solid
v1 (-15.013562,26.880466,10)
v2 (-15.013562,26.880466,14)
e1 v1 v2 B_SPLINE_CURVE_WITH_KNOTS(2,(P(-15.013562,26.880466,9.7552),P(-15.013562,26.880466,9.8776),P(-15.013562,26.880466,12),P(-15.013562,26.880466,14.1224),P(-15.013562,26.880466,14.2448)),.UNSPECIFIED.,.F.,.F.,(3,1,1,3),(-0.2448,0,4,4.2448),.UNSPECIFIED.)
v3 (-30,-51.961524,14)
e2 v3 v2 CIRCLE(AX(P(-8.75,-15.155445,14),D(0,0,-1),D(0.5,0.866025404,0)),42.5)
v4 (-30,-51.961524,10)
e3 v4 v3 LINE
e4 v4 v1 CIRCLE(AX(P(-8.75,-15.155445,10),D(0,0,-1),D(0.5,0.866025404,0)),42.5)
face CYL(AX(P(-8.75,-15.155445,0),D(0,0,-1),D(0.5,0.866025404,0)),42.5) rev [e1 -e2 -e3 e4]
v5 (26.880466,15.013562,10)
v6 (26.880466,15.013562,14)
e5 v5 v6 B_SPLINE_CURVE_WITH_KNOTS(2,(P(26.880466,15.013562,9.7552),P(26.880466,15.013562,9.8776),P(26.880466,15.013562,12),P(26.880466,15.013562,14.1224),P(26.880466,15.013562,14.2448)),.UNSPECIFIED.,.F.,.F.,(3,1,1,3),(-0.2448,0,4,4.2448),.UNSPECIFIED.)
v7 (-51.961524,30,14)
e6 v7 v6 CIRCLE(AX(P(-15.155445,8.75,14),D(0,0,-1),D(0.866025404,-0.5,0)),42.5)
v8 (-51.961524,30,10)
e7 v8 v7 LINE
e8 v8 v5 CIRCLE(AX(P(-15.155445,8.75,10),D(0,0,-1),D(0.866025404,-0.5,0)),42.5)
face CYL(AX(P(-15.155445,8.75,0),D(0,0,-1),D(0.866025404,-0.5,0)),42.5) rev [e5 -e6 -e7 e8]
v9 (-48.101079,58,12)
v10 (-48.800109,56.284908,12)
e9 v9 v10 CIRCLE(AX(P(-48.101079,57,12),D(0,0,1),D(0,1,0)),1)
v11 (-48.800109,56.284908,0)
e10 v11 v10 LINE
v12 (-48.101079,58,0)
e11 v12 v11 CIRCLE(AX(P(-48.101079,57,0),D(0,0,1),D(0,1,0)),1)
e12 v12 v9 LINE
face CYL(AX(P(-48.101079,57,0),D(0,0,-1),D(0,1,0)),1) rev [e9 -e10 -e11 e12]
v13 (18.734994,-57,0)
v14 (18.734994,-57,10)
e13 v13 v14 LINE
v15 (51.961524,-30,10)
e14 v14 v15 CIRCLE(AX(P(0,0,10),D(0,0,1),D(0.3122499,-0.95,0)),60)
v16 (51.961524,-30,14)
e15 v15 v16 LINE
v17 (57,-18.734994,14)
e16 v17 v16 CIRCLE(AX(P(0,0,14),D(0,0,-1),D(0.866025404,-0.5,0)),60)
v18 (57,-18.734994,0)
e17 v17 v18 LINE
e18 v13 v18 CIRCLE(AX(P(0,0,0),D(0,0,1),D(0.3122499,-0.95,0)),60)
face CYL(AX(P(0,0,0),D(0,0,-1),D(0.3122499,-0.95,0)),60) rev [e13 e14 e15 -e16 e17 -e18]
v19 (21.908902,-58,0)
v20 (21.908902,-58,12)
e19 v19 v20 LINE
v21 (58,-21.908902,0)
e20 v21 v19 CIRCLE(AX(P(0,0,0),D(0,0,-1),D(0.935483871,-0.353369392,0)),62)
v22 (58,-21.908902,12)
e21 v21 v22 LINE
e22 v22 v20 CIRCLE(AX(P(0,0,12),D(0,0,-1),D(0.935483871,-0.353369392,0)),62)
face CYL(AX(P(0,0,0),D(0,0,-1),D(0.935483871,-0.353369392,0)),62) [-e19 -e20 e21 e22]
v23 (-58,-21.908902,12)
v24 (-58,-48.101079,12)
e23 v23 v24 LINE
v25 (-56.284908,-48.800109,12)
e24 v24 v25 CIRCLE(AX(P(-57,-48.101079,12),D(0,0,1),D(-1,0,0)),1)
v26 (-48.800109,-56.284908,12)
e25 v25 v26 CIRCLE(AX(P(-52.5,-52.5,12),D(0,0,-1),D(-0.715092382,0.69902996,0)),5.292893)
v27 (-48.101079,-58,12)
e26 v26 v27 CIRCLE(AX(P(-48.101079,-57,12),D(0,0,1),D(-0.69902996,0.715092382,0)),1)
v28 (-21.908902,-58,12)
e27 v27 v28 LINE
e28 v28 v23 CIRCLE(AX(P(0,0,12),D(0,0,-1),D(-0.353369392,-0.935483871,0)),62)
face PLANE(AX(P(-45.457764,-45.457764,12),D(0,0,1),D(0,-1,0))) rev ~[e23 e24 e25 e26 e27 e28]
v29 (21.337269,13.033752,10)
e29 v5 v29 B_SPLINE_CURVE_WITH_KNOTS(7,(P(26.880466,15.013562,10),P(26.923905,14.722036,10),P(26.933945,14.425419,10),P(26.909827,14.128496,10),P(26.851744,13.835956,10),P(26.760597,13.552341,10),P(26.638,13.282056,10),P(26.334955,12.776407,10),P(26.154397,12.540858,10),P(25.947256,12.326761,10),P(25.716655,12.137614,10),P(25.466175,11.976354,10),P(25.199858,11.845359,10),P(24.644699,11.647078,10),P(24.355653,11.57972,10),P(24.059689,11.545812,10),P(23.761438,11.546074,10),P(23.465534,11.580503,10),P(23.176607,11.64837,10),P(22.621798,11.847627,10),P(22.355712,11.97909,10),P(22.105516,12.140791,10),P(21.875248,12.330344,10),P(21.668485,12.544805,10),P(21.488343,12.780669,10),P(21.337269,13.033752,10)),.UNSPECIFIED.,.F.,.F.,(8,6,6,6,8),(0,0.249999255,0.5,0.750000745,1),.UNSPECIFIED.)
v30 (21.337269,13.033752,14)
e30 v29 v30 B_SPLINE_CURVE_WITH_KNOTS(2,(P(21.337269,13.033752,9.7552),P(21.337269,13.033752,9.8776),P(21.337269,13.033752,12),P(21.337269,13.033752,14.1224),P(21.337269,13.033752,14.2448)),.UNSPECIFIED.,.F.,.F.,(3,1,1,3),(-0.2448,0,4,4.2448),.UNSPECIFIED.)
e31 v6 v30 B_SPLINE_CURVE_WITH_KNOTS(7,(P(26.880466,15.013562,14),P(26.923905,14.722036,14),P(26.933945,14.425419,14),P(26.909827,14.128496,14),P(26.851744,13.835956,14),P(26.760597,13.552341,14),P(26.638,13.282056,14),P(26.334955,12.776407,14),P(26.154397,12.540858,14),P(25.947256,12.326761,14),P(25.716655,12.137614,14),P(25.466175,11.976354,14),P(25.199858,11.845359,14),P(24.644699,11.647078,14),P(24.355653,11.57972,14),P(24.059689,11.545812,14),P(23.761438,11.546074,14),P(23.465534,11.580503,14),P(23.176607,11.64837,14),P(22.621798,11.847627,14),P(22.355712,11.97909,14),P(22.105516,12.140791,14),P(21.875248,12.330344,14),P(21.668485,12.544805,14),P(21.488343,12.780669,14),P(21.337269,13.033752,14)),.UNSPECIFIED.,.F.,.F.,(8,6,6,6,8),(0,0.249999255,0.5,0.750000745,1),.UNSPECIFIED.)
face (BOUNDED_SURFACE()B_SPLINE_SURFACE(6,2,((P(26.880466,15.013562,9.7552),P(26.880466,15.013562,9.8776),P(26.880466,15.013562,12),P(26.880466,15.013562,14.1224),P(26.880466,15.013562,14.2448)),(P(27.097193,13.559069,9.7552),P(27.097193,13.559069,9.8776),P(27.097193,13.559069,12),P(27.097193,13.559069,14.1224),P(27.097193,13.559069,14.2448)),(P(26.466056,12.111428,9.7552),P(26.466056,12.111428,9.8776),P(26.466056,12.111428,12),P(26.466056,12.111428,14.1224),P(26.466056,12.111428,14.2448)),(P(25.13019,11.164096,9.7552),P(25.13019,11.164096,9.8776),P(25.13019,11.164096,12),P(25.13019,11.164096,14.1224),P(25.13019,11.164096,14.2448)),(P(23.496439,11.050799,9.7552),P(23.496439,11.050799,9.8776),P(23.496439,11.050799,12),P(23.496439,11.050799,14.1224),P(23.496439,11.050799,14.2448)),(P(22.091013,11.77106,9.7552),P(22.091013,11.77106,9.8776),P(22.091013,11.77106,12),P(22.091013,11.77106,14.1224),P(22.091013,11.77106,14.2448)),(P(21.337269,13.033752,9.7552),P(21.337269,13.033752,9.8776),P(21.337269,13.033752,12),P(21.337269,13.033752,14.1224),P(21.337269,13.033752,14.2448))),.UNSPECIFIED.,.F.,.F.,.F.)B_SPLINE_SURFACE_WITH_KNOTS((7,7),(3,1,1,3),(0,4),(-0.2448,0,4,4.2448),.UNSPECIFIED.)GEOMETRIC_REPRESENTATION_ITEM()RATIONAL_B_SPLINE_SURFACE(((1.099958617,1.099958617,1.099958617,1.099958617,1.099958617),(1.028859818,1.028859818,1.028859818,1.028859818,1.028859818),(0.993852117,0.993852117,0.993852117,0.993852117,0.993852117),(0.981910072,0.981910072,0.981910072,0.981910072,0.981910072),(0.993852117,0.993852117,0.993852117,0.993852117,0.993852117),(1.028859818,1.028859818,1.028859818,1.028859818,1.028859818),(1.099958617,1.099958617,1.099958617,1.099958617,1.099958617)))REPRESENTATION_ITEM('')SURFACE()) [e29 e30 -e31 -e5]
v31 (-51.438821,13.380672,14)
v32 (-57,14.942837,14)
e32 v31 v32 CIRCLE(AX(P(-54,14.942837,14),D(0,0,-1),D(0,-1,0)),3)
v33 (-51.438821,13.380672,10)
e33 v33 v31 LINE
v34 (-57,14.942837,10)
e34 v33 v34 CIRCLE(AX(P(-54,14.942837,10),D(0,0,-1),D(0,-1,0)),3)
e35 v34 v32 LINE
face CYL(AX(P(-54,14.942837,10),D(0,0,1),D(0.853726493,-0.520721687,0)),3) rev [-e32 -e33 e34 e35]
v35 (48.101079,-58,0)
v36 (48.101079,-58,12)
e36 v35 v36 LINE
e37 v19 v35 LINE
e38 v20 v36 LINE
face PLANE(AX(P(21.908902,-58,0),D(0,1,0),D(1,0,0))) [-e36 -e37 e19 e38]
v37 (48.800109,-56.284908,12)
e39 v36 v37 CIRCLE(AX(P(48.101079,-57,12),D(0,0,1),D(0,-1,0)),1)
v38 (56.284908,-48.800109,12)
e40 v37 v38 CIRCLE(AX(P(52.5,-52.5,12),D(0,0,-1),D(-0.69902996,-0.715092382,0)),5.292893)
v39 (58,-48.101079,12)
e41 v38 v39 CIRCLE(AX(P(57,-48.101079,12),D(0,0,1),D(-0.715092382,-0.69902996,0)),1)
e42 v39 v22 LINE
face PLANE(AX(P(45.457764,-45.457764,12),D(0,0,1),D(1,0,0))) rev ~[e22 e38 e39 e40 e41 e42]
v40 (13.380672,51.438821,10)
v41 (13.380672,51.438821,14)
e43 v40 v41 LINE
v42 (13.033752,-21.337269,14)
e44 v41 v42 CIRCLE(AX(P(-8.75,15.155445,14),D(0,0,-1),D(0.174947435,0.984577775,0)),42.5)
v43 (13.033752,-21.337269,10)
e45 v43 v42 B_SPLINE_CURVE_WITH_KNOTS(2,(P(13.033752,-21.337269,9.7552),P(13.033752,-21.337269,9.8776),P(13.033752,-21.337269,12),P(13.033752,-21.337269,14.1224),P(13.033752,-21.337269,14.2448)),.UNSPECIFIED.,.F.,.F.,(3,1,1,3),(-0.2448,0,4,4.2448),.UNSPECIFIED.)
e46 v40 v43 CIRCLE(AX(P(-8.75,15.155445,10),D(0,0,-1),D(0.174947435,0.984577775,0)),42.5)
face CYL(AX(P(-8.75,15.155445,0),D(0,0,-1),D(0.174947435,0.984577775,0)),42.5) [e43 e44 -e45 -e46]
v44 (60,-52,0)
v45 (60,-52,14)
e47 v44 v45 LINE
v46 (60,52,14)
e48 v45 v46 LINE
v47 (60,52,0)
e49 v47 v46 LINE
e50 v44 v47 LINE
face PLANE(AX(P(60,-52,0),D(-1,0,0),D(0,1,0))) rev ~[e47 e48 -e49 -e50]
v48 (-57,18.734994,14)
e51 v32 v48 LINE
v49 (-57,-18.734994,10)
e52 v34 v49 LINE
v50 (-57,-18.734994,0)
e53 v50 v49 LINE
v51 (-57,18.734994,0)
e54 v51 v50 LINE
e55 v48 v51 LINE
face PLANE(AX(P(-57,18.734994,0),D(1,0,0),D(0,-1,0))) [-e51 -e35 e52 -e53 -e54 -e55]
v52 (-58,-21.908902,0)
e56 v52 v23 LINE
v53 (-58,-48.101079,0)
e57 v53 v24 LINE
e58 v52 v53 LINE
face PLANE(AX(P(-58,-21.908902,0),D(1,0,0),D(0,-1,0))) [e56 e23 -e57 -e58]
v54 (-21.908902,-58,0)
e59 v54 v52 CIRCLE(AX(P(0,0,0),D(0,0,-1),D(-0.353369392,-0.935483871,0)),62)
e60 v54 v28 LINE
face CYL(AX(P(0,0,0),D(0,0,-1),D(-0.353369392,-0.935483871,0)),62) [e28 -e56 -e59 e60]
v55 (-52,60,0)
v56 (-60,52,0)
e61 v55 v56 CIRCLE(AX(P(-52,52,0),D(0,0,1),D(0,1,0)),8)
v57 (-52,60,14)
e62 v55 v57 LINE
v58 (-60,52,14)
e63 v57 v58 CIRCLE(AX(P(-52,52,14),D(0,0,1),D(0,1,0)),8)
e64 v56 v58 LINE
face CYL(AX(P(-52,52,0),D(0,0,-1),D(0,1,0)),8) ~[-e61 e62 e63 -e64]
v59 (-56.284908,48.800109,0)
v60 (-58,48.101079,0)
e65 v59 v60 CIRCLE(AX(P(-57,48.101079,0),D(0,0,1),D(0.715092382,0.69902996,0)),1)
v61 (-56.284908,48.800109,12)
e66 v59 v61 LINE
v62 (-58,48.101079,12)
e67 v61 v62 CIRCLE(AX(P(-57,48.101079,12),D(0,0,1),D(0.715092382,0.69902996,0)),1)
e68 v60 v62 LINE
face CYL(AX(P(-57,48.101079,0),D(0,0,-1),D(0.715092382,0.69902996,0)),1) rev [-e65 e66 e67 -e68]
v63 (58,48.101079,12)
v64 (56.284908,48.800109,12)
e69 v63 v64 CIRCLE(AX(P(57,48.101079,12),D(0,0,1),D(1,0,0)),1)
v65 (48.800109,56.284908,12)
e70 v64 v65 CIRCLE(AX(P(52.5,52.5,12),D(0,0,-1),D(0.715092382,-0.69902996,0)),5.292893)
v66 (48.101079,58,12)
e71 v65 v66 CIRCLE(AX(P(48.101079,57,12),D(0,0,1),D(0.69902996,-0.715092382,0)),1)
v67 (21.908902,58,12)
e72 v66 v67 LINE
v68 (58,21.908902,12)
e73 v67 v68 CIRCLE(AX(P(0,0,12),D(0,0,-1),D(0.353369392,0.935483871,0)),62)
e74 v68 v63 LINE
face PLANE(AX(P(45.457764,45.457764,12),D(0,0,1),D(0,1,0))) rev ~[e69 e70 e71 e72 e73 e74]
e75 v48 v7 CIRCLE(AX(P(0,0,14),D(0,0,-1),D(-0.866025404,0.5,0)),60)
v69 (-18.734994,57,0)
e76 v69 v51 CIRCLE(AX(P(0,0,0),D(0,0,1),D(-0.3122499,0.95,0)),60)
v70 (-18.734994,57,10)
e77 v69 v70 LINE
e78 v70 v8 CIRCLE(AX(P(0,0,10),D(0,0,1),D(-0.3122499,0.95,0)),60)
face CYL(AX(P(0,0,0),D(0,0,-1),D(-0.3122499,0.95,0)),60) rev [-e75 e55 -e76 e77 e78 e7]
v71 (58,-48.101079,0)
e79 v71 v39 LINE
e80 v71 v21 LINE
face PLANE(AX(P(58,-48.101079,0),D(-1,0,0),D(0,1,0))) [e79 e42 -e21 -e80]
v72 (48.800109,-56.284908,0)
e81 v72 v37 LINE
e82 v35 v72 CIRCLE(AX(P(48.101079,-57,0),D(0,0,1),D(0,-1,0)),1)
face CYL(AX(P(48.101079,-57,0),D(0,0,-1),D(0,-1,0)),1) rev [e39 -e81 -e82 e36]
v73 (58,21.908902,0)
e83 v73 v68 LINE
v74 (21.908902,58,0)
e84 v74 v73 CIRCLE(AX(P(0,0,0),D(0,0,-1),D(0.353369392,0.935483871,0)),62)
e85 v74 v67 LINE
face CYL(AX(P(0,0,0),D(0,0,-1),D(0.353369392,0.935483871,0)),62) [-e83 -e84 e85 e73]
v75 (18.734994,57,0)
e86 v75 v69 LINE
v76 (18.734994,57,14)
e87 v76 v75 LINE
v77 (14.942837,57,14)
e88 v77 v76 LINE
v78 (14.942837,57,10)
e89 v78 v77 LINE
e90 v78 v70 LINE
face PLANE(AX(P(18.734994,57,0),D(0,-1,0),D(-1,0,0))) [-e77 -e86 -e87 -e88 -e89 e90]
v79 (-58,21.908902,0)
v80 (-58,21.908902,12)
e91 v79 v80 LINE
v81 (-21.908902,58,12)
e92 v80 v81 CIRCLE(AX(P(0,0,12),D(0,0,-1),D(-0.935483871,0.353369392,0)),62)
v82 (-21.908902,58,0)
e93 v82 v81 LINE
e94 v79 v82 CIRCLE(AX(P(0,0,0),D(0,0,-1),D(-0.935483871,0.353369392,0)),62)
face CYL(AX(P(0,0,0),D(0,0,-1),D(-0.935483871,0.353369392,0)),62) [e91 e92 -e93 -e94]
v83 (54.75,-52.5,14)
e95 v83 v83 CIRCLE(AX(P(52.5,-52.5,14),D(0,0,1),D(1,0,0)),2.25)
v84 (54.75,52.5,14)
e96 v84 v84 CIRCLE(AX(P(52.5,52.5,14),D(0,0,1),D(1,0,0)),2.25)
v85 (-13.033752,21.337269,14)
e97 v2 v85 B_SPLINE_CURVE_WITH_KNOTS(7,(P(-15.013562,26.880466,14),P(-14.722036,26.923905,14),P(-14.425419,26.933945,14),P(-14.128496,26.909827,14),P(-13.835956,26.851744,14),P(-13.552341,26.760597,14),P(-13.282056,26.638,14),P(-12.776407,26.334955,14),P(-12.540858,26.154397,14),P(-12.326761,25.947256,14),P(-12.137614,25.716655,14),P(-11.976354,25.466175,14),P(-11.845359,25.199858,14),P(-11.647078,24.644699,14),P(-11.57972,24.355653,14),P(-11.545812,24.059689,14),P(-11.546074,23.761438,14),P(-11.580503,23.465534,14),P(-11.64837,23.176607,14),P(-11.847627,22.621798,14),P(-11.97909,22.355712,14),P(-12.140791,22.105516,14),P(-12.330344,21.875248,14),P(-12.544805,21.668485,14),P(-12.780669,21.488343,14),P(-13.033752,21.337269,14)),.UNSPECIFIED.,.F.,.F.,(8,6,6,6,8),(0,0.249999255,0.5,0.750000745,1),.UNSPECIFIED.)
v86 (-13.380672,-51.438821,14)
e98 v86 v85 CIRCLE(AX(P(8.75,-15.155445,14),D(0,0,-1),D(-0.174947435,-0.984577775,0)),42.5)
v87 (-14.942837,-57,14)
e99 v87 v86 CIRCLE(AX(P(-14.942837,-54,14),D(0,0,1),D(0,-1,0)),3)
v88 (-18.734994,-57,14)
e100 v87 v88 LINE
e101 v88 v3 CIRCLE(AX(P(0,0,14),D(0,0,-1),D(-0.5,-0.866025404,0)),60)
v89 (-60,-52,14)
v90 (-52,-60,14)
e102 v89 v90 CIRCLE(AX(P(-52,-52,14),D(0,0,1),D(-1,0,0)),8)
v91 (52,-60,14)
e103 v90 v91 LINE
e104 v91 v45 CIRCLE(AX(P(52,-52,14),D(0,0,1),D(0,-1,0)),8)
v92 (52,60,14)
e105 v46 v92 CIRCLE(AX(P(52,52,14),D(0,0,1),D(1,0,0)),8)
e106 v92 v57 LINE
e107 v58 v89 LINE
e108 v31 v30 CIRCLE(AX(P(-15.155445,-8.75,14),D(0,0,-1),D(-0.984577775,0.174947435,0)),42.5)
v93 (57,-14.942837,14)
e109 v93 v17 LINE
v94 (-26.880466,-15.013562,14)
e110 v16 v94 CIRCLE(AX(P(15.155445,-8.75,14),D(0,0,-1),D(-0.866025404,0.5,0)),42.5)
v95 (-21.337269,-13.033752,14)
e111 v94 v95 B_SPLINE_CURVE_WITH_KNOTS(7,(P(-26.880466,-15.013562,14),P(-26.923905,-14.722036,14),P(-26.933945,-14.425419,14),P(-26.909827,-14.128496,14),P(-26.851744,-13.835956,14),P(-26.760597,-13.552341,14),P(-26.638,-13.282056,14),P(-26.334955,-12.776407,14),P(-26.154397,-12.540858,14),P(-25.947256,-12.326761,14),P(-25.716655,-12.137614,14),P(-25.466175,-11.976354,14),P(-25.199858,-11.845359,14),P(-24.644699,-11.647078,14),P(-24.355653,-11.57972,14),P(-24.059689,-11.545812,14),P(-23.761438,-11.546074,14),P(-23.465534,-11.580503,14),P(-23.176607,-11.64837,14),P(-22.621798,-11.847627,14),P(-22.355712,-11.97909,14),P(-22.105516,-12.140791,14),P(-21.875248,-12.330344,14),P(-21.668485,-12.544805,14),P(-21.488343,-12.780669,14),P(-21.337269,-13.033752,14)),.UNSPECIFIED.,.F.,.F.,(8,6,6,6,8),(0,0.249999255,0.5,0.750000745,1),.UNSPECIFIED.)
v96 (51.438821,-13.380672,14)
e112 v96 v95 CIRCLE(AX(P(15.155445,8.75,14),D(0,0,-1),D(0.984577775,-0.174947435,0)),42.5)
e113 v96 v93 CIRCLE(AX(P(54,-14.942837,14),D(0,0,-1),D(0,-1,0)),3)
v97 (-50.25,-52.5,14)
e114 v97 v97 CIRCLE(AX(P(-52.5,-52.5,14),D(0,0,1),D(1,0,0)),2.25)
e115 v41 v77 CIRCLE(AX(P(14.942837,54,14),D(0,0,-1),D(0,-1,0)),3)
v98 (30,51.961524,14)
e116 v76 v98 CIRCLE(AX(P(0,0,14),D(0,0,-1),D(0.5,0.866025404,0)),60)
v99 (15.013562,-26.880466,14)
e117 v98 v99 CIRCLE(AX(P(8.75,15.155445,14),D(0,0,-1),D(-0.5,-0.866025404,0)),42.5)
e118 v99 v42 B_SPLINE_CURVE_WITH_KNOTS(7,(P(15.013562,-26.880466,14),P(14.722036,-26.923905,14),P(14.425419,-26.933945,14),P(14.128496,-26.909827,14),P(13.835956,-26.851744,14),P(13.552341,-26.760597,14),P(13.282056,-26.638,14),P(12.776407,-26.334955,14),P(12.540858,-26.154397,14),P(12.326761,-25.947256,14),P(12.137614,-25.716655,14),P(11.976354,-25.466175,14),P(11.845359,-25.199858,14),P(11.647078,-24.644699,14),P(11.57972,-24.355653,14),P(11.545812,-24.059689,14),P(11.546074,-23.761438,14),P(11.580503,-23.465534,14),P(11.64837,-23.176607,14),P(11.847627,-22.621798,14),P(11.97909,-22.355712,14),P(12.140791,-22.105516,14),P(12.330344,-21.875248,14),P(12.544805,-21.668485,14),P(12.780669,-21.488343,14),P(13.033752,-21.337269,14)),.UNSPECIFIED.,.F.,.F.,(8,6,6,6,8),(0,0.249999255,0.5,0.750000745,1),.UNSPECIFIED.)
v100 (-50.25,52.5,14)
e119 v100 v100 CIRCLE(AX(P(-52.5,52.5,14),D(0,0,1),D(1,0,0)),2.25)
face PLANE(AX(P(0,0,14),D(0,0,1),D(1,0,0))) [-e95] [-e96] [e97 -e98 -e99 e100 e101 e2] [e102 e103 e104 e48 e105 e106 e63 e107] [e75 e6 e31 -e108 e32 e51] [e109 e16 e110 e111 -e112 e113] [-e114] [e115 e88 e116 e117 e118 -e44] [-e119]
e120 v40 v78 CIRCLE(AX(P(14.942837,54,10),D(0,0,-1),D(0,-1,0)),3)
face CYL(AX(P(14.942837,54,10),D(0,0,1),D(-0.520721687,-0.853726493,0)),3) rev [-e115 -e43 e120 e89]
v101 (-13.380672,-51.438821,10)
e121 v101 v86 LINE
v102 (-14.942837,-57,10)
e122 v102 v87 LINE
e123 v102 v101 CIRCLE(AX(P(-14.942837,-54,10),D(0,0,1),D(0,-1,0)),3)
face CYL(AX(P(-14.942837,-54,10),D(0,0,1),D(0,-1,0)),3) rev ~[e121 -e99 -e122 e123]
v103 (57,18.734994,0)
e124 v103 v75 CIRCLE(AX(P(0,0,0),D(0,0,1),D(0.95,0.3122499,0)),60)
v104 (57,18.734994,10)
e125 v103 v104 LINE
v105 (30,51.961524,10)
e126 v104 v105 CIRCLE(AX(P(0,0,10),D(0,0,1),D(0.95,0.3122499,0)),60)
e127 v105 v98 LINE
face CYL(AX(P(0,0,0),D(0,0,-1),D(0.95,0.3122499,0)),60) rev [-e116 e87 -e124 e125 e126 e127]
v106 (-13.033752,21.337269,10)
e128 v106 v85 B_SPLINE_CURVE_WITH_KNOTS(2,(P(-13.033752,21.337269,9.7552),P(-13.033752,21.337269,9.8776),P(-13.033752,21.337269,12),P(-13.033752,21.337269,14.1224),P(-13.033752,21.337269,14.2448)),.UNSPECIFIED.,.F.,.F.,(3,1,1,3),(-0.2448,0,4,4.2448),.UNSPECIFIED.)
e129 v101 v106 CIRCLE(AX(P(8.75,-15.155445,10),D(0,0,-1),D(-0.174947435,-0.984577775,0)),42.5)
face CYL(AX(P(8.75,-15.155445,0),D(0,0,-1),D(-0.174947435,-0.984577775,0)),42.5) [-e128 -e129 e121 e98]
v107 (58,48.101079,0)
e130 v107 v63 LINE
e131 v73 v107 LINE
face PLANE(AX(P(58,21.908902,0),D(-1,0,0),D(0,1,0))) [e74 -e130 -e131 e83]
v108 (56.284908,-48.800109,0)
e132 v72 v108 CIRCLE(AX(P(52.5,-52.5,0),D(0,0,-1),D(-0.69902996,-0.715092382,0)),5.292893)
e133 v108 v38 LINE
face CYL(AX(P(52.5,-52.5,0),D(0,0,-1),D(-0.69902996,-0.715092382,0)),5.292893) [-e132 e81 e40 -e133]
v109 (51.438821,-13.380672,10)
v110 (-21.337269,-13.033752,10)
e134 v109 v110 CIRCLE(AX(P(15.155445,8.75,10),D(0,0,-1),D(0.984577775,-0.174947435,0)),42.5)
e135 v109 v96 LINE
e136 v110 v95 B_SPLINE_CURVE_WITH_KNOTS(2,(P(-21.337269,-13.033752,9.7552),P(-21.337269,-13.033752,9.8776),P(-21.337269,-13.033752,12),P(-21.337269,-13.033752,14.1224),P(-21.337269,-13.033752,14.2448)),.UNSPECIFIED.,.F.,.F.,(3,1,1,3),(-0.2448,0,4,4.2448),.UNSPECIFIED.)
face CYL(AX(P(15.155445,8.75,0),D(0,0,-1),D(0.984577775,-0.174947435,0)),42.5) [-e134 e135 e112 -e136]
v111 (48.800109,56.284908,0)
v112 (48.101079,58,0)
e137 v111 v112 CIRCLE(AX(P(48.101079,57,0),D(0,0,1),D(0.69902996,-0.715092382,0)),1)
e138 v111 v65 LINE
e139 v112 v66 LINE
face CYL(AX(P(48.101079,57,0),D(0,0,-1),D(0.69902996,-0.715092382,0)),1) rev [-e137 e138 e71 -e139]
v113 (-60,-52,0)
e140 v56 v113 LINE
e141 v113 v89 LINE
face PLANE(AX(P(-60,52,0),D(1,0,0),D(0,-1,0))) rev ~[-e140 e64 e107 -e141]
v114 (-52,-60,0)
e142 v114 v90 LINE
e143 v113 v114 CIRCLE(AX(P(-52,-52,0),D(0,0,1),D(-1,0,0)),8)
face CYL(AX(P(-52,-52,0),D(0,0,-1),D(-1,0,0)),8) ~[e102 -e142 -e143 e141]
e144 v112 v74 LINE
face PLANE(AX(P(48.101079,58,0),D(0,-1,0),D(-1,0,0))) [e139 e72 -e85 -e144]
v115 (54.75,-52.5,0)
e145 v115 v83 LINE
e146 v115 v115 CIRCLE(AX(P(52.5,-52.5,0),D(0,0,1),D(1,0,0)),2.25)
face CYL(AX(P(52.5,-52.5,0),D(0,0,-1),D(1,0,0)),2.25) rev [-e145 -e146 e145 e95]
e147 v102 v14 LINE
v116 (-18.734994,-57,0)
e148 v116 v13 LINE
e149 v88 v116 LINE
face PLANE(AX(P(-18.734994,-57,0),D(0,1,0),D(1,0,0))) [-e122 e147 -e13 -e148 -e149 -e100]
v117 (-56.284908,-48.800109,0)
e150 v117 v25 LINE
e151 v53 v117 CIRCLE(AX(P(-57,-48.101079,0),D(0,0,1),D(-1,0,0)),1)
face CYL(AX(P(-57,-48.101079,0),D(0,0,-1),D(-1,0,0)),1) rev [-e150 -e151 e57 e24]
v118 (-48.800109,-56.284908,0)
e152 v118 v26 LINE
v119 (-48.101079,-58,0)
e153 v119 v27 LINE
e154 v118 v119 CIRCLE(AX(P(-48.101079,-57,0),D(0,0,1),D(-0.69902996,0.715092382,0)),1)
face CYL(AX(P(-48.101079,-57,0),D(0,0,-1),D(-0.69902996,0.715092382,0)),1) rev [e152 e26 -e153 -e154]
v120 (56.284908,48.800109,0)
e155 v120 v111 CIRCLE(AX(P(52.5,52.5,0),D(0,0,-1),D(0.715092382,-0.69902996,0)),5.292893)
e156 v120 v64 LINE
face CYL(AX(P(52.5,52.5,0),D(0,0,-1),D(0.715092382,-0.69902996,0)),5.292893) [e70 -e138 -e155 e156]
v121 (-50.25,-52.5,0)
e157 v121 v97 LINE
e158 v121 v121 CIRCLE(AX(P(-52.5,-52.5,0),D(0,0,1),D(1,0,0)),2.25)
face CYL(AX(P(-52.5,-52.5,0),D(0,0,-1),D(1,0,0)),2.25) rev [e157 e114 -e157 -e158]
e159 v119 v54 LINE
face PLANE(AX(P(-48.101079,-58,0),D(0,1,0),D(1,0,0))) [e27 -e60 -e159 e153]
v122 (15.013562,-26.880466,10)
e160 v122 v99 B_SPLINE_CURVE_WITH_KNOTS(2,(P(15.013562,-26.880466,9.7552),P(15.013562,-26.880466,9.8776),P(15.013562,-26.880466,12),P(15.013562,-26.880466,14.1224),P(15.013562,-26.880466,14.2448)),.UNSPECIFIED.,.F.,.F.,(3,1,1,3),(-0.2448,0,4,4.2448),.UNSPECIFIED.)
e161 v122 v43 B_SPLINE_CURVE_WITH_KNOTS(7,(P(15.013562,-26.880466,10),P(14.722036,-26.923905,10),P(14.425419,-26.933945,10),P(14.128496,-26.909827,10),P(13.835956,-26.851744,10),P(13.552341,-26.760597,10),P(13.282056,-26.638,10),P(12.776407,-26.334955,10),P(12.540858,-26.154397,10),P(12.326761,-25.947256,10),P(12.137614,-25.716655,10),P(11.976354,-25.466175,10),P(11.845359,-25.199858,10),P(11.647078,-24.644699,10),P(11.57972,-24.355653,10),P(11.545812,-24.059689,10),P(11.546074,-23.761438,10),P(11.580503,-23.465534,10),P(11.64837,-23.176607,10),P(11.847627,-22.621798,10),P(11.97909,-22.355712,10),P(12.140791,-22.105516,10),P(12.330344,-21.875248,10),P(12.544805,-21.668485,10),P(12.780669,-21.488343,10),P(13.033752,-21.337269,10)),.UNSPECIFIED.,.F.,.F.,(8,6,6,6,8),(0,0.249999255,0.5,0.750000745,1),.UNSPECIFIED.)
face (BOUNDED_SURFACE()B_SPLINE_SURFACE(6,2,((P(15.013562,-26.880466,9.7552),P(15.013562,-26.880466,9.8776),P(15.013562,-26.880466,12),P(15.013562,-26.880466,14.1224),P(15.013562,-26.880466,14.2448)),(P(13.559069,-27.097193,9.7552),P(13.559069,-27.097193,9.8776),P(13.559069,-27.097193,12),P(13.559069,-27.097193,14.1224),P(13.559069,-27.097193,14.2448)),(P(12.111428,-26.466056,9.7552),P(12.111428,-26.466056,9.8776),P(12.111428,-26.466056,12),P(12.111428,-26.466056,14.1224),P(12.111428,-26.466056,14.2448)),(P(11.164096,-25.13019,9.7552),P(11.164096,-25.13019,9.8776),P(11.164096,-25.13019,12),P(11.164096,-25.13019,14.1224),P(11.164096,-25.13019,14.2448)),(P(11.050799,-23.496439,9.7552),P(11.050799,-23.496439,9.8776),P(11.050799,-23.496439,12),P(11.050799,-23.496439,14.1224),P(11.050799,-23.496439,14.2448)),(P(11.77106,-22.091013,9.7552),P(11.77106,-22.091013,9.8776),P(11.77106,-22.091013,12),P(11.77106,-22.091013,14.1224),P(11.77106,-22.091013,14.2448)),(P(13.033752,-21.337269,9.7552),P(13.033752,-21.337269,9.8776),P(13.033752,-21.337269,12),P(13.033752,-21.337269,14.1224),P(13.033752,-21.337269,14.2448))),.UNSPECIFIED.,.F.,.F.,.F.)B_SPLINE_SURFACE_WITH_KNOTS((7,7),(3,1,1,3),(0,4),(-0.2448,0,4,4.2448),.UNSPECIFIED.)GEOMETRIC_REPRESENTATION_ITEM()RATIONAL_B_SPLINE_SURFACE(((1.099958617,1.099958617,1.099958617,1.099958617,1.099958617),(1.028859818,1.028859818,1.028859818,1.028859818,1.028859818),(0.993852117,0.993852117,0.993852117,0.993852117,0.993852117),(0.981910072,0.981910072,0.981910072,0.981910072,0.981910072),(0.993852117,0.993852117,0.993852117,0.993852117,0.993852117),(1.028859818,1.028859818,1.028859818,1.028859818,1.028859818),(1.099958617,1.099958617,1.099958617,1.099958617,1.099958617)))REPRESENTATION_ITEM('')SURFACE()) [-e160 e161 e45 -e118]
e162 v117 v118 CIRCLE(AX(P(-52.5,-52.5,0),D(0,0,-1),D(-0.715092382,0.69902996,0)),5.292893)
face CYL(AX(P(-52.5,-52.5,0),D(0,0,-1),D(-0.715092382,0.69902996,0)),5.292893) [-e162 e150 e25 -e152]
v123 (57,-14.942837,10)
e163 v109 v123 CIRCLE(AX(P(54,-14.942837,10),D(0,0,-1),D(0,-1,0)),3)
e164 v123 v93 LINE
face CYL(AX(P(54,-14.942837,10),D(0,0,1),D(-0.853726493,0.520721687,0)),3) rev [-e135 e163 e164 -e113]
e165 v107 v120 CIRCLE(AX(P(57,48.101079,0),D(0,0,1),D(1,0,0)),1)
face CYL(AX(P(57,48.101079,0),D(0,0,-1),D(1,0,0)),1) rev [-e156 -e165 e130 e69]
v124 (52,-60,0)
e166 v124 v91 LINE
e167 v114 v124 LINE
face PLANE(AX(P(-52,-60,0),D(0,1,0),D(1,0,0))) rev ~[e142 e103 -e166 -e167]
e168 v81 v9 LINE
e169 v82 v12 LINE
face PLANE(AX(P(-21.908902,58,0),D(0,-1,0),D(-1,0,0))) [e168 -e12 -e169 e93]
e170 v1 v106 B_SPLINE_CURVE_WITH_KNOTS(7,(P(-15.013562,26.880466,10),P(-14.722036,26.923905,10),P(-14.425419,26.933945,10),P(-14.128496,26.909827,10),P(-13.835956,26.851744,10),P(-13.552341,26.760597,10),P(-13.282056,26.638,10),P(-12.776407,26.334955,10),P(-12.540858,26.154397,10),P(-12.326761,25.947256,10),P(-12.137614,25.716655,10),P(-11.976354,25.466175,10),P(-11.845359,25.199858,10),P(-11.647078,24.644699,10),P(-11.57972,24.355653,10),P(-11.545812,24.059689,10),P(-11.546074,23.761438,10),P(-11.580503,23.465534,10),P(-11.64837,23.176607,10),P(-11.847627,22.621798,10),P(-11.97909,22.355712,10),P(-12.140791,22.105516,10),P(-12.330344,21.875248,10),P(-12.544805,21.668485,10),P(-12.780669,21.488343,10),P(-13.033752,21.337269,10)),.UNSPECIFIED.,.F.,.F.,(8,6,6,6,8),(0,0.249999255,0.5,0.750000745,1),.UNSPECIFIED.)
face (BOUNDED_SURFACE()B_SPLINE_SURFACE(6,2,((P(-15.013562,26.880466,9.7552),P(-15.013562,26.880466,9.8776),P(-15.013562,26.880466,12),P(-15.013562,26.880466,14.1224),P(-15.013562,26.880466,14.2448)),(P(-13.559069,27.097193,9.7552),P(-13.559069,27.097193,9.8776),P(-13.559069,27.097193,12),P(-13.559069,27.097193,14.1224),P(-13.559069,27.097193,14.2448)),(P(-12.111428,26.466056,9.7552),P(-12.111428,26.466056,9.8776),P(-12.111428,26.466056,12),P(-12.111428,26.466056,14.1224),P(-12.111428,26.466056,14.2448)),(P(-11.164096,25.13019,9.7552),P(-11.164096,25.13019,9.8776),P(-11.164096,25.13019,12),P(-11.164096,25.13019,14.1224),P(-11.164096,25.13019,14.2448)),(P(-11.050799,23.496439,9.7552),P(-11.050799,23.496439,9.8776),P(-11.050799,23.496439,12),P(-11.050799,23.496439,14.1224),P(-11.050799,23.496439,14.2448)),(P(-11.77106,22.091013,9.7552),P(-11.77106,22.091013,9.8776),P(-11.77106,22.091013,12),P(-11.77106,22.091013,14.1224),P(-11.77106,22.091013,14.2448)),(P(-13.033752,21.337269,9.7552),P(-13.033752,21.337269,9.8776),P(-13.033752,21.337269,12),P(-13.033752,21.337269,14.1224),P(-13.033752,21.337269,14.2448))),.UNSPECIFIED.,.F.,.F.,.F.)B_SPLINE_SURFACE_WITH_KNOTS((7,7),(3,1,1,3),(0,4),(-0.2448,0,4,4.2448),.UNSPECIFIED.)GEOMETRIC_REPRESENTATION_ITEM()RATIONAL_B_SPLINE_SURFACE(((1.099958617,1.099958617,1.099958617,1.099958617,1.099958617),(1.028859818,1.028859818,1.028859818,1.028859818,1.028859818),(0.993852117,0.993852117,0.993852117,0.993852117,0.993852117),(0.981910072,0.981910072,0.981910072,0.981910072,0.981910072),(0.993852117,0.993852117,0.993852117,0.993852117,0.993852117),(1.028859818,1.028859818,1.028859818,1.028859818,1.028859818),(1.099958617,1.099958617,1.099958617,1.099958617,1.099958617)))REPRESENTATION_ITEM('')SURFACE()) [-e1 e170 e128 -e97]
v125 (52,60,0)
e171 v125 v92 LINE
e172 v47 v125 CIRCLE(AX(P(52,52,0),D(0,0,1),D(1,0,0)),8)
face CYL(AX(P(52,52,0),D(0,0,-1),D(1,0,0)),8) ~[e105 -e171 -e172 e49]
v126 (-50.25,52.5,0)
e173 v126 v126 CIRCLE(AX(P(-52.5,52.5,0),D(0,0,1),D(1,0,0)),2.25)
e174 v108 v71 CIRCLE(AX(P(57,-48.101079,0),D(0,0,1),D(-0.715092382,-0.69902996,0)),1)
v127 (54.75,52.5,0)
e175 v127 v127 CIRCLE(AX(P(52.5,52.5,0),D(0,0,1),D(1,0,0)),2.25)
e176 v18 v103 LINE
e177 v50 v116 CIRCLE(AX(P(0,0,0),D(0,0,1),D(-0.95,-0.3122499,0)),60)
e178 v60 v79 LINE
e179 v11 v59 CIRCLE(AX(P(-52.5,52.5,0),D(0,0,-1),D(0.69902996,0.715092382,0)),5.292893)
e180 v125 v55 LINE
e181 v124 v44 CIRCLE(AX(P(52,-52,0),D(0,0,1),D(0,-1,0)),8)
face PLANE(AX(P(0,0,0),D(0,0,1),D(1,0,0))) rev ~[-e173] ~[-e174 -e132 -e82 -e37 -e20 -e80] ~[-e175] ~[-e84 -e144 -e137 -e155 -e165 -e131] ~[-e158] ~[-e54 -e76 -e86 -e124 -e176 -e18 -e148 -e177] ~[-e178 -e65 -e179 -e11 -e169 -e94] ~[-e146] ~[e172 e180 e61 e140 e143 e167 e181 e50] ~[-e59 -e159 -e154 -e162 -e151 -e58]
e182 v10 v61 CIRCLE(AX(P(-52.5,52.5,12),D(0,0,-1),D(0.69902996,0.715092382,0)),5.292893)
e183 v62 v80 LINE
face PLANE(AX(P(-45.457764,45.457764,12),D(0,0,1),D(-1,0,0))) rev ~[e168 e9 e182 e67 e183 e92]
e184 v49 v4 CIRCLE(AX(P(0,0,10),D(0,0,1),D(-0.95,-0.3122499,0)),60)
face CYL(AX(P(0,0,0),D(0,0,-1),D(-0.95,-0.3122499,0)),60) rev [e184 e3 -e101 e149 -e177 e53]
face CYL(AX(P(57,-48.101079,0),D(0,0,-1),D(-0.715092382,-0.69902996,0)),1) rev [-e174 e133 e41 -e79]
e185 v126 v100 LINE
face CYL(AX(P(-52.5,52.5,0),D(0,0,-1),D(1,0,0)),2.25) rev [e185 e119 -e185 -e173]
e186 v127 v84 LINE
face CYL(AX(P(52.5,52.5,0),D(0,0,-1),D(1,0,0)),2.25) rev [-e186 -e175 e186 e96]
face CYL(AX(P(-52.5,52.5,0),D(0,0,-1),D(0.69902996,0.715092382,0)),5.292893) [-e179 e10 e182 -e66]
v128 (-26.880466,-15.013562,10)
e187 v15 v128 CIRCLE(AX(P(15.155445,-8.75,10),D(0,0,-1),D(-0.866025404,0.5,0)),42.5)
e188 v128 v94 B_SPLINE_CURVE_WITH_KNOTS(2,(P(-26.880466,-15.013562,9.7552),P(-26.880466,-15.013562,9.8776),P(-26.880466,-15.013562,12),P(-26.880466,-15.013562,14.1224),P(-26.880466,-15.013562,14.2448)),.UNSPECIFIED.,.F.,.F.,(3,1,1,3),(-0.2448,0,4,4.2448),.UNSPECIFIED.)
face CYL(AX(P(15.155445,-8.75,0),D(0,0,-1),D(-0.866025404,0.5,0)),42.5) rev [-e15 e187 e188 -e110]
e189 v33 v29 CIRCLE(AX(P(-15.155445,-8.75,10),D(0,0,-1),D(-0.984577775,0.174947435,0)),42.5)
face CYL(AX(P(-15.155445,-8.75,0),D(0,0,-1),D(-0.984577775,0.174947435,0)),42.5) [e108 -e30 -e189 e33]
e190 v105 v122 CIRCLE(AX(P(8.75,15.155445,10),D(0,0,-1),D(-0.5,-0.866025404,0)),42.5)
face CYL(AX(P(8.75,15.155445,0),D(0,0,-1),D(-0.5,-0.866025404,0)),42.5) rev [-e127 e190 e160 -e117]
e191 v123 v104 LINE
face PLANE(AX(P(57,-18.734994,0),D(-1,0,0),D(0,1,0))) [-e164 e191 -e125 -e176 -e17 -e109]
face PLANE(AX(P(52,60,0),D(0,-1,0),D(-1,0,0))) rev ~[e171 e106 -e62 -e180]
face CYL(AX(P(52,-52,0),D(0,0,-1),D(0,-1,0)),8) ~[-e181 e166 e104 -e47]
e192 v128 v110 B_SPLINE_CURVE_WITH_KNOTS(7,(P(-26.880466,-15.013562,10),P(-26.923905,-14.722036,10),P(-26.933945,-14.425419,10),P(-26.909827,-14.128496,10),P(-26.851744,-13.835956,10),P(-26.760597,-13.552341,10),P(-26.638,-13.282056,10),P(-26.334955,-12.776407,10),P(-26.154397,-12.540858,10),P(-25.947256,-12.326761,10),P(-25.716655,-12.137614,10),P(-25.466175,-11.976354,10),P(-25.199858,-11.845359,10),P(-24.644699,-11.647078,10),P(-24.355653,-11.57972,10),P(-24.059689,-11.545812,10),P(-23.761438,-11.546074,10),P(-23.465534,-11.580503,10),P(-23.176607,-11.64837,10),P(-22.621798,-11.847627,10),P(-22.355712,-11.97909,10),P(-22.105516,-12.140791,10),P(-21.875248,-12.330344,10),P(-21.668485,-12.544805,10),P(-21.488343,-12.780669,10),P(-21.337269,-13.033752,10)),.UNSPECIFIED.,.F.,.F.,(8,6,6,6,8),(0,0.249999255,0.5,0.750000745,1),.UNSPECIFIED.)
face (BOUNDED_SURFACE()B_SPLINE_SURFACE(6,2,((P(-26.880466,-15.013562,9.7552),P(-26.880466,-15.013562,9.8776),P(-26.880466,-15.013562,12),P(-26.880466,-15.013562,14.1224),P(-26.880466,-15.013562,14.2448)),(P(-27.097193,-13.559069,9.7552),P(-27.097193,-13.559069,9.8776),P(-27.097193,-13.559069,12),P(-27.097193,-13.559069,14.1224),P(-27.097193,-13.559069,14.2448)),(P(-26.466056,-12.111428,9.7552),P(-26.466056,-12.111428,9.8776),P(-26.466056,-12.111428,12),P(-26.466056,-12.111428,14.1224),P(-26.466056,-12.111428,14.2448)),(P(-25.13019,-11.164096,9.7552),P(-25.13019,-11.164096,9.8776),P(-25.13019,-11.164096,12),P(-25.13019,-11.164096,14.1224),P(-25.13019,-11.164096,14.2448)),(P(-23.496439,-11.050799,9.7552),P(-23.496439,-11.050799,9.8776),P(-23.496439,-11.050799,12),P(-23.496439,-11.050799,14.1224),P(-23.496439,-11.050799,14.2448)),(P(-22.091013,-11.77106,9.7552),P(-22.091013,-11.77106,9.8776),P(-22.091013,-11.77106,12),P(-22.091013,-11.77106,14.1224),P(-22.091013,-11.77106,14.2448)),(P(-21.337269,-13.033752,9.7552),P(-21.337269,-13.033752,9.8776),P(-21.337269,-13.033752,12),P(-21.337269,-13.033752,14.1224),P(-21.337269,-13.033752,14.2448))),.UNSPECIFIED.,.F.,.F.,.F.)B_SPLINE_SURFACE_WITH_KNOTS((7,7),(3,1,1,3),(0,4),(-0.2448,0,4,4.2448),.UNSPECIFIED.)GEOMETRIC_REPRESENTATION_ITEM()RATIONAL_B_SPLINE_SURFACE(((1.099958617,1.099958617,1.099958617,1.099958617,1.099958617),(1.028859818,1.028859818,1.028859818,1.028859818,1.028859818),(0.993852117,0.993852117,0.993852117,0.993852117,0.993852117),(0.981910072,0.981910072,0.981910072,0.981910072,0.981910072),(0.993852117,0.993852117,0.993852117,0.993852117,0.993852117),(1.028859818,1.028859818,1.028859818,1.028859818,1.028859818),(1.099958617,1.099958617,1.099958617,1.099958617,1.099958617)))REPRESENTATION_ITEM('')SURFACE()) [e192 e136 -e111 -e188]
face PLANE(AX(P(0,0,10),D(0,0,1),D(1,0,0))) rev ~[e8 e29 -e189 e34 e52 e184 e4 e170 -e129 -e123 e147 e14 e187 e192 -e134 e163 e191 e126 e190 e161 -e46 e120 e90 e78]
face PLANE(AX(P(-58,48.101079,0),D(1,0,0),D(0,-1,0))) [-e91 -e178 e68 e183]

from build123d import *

# Parameters (mm, degrees)
F0_R            = 25
F0_R_2          = 2.25
F1_DEPTH        = 14
F2_DEPTH        = 10
F4_DEPTH        = 14.001
F5_R            = 3
F7_DEPTH        = 12
F7_COPIES_COUNT = 4


# Not quite as in the source:
# - a pattern or mirror of a feature is missing from the dataset's text; its kind, count and spacing are read off the source's solid


with BuildPart() as f1:
    # F0 (on Top) → F1 (new body)
    with BuildSketch(Plane.XY):
        with BuildLine():
            ThreePointArc((57, 18.7349939952), (42.4264068712, 42.4264068712), (18.7349939952, 57))
            Line((18.7349939952, 57), (-18.7349939952, 57))
            ThreePointArc((-18.7349939952, 57), (-42.4264068712, 42.4264068712), (-57, 18.7349939952))
            Line((-57, 18.7349939952), (-57, -18.7349939952))
            ThreePointArc((-57, -18.7349939952), (-42.4264068712, -42.4264068712), (-18.7349939952, -57))
            Line((-18.7349939952, -57), (18.7349939952, -57))
            ThreePointArc((18.7349939952, -57), (42.4264068712, -42.4264068712), (57, -18.7349939952))
            Line((57, -18.7349939952), (57, 18.7349939952))
        make_face()
        Circle(F0_R, mode=Mode.SUBTRACT)
        Circle(F0_R)
        with BuildLine():
            ThreePointArc((-18.7349939952, 57), (-9.486832838, 59.2452529972), (2.885e-07, 60))
            Line((2.885e-07, 60), (-52, 60))
            ThreePointArc((-52, 60), (-57.6568542495, 57.6568542495), (-60, 52))
            Line((-60, 52), (-60, 2.895e-07))
            ThreePointArc((-60, 2.895e-07), (-59.2452529515, 9.4868331234), (-57, 18.7349939952))
            ThreePointArc((-57, 18.7349939952), (-42.4264068712, 42.4264068712), (-18.7349939952, 57))
        make_face()
        with Locations((-52.5, 52.5)):
            Circle(F0_R_2, mode=Mode.SUBTRACT)
        with BuildLine():
            ThreePointArc((-57, -18.7349939952), (-59.2452529973, -9.4868328376), (-60, 2.895e-07))
            Line((-60, 2.895e-07), (-60, -52))
            ThreePointArc((-60, -52), (-57.6568542495, -57.6568542495), (-52, -60))
            Line((-52, -60), (-2.57e-07, -60))
            ThreePointArc((-2.57e-07, -60), (-9.4868331074, -59.2452529541), (-18.7349939952, -57))
            ThreePointArc((-18.7349939952, -57), (-42.4264068712, -42.4264068712), (-57, -18.7349939952))
        make_face()
        with Locations((-52.5, -52.5)):
            Circle(F0_R_2, mode=Mode.SUBTRACT)
        with BuildLine():
            Line((60, -52), (60, 0))
            ThreePointArc((60, 0), (59.2452529744, -9.4868329805), (57, -18.7349939952))
            ThreePointArc((57, -18.7349939952), (42.4264068712, -42.4264068712), (18.7349939952, -57))
            ThreePointArc((18.7349939952, -57), (9.4868328536, -59.2452529947), (-2.57e-07, -60))
            Line((-2.57e-07, -60), (52, -60))
            ThreePointArc((52, -60), (57.6568542495, -57.6568542495), (60, -52))
        make_face()
        with Locations((52.5, -52.5)):
            Circle(F0_R_2, mode=Mode.SUBTRACT)
        with BuildLine():
            ThreePointArc((60, 52), (57.6568542495, 57.6568542495), (52, 60))
            Line((52, 60), (2.885e-07, 60))
            ThreePointArc((2.885e-07, 60), (9.486833123, 59.2452529516), (18.7349939952, 57))
            ThreePointArc((18.7349939952, 57), (42.4264068712, 42.4264068712), (57, 18.7349939952))
            ThreePointArc((57, 18.7349939952), (59.2452529744, 9.4868329805), (60, 0))
            Line((60, 0), (60, 52))
        make_face()
        with Locations((52.5, 52.5)):
            Circle(F0_R_2, mode=Mode.SUBTRACT)
        with BuildLine():
            ThreePointArc((18.7349939952, 57), (9.486833123, 59.2452529516), (2.885e-07, 60))
            ThreePointArc((2.885e-07, 60), (-9.486832838, 59.2452529972), (-18.7349939952, 57))
            Line((-18.7349939952, 57), (18.7349939952, 57))
        make_face()
        with BuildLine():
            Line((-57, -18.7349939952), (-57, 18.7349939952))
            ThreePointArc((-57, 18.7349939952), (-59.2452529515, 9.4868331234), (-60, 2.895e-07))
            ThreePointArc((-60, 2.895e-07), (-59.2452529973, -9.4868328376), (-57, -18.7349939952))
        make_face()
        with BuildLine():
            ThreePointArc((-2.57e-07, -60), (9.4868328536, -59.2452529947), (18.7349939952, -57))
            Line((18.7349939952, -57), (-18.7349939952, -57))
            ThreePointArc((-18.7349939952, -57), (-9.4868331074, -59.2452529541), (-2.57e-07, -60))
        make_face()
        with BuildLine():
            ThreePointArc((57, -18.7349939952), (59.2452529744, -9.4868329805), (60, 0))
            ThreePointArc((60, 0), (59.2452529744, 9.4868329805), (57, 18.7349939952))
            Line((57, 18.7349939952), (57, -18.7349939952))
        make_face()
    extrude(amount=F1_DEPTH)

    # F0 (on Top) → F2 (cut)
    with BuildSketch(Plane.XY):
        with BuildLine():
            ThreePointArc((57, 18.7349939952), (42.4264068712, 42.4264068712), (18.7349939952, 57))
            Line((18.7349939952, 57), (-18.7349939952, 57))
            ThreePointArc((-18.7349939952, 57), (-42.4264068712, 42.4264068712), (-57, 18.7349939952))
            Line((-57, 18.7349939952), (-57, -18.7349939952))
            ThreePointArc((-57, -18.7349939952), (-42.4264068712, -42.4264068712), (-18.7349939952, -57))
            Line((-18.7349939952, -57), (18.7349939952, -57))
            ThreePointArc((18.7349939952, -57), (42.4264068712, -42.4264068712), (57, -18.7349939952))
            Line((57, -18.7349939952), (57, 18.7349939952))
        make_face()
        Circle(F0_R, mode=Mode.SUBTRACT)
        Circle(F0_R)
    extrude(amount=F2_DEPTH, mode=Mode.SUBTRACT)

    # F3 (on face) → F4 (cut, through all)
    with BuildSketch(Plane.XY):
        with BuildLine():
            ThreePointArc((51.9615242271, -30), (54.7711468799, -24.4973767873), (57, -18.7349939952))
            Line((57, -18.7349939952), (57, 1.314733996))
            ThreePointArc((57, 1.314733996), (22.5078780664, -33.1091892137), (-21.6506350946, -12.5))
            ThreePointArc((-21.6506350946, -12.5), (-25, 0), (-21.6506350946, 12.5))
            ThreePointArc((-21.6506350946, 12.5), (-6.0945554338, -45.5560796608), (51.9615242271, -30))
        make_face()
        with BuildLine():
            Line((-18.7349939952, -57), (1.314733996, -57))
            ThreePointArc((1.314733996, -57), (-33.1091892137, -22.5078780664), (-12.5, 21.6506350946))
            ThreePointArc((-12.5, 21.6506350946), (0, 25), (12.5, 21.6506350946))
            ThreePointArc((12.5, 21.6506350946), (-45.5560796608, 6.0945554338), (-30, -51.9615242271))
            ThreePointArc((-30, -51.9615242271), (-24.4973767873, -54.7711468799), (-18.7349939952, -57))
        make_face()
        with BuildLine():
            ThreePointArc((-12.5, -21.6506350946), (45.5560796608, -6.0945554338), (30, 51.9615242271))
            ThreePointArc((30, 51.9615242271), (24.4973767873, 54.7711468799), (18.7349939952, 57))
            Line((18.7349939952, 57), (-1.314733996, 57))
            ThreePointArc((-1.314733996, 57), (33.1091892137, 22.5078780664), (12.5, -21.6506350946))
            ThreePointArc((12.5, -21.6506350946), (0, -25), (-12.5, -21.6506350946))
        make_face()
        with BuildLine():
            ThreePointArc((25, 0), (24.1481456572, -6.4704761276), (21.6506350946, -12.5))
            ThreePointArc((21.6506350946, -12.5), (6.0945554338, 45.5560796608), (-51.9615242271, 30))
            ThreePointArc((-51.9615242271, 30), (-54.7711468799, 24.4973767873), (-57, 18.7349939952))
            Line((-57, 18.7349939952), (-57, -1.314733996))
            ThreePointArc((-57, -1.314733996), (-22.5078780664, 33.1091892137), (21.6506350946, 12.5))
            ThreePointArc((21.6506350946, 12.5), (24.1481456572, 6.4704761276), (25, 0))
        make_face()
    extrude(amount=F4_DEPTH, mode=Mode.SUBTRACT)

    # F5
    f5_edges = [f1.edges().sort_by_distance(p)[0] for p in [
        (21.650635, -12.5, 12),
        (12.5, 21.650635, 12),
        (-21.650635, 12.5, 12),
        (-12.5, -21.650635, 12),
        (-57, -1.314734, 12),
        (-1.314734, 57, 12),
        (57, 1.314734, 12),
        (1.314734, -57, 12),
    ]]
    fillet(f5_edges, radius=F5_R)

    # F6 (on face) → F7 (cut)
    with BuildSketch(Plane.XY):
        with BuildLine():
            ThreePointArc((58, -21.9089023002), (43.8406204336, -43.8406204336), (21.9089023002, -58))
            Line((21.9089023002, -58), (48.1010791024, -58))
            ThreePointArc((48.1010791024, -58), (49.0271170017, -57.3774305355), (48.8001090628, -56.2849076182))
            ThreePointArc((48.8001090628, -56.2849076182), (48.7573593129, -48.7573593129), (56.2849076182, -48.8001090628))
            ThreePointArc((56.2849076182, -48.8001090628), (57.3774305355, -49.0271170017), (58, -48.1010791024))
            Line((58, -48.1010791024), (58, -21.9089023002))
        make_face()
    f7 = extrude(amount=F7_DEPTH, mode=Mode.SUBTRACT)

    # F7_copies: F7 ×4 about axis
    f7_copies_axis = Axis((0, 0, 0), (0, 0, 1))
    for i in range(1, F7_COPIES_COUNT):
        add(f7.rotate(f7_copies_axis, i * 360 / F7_COPIES_COUNT), mode=Mode.SUBTRACT)


solid = f1.part
